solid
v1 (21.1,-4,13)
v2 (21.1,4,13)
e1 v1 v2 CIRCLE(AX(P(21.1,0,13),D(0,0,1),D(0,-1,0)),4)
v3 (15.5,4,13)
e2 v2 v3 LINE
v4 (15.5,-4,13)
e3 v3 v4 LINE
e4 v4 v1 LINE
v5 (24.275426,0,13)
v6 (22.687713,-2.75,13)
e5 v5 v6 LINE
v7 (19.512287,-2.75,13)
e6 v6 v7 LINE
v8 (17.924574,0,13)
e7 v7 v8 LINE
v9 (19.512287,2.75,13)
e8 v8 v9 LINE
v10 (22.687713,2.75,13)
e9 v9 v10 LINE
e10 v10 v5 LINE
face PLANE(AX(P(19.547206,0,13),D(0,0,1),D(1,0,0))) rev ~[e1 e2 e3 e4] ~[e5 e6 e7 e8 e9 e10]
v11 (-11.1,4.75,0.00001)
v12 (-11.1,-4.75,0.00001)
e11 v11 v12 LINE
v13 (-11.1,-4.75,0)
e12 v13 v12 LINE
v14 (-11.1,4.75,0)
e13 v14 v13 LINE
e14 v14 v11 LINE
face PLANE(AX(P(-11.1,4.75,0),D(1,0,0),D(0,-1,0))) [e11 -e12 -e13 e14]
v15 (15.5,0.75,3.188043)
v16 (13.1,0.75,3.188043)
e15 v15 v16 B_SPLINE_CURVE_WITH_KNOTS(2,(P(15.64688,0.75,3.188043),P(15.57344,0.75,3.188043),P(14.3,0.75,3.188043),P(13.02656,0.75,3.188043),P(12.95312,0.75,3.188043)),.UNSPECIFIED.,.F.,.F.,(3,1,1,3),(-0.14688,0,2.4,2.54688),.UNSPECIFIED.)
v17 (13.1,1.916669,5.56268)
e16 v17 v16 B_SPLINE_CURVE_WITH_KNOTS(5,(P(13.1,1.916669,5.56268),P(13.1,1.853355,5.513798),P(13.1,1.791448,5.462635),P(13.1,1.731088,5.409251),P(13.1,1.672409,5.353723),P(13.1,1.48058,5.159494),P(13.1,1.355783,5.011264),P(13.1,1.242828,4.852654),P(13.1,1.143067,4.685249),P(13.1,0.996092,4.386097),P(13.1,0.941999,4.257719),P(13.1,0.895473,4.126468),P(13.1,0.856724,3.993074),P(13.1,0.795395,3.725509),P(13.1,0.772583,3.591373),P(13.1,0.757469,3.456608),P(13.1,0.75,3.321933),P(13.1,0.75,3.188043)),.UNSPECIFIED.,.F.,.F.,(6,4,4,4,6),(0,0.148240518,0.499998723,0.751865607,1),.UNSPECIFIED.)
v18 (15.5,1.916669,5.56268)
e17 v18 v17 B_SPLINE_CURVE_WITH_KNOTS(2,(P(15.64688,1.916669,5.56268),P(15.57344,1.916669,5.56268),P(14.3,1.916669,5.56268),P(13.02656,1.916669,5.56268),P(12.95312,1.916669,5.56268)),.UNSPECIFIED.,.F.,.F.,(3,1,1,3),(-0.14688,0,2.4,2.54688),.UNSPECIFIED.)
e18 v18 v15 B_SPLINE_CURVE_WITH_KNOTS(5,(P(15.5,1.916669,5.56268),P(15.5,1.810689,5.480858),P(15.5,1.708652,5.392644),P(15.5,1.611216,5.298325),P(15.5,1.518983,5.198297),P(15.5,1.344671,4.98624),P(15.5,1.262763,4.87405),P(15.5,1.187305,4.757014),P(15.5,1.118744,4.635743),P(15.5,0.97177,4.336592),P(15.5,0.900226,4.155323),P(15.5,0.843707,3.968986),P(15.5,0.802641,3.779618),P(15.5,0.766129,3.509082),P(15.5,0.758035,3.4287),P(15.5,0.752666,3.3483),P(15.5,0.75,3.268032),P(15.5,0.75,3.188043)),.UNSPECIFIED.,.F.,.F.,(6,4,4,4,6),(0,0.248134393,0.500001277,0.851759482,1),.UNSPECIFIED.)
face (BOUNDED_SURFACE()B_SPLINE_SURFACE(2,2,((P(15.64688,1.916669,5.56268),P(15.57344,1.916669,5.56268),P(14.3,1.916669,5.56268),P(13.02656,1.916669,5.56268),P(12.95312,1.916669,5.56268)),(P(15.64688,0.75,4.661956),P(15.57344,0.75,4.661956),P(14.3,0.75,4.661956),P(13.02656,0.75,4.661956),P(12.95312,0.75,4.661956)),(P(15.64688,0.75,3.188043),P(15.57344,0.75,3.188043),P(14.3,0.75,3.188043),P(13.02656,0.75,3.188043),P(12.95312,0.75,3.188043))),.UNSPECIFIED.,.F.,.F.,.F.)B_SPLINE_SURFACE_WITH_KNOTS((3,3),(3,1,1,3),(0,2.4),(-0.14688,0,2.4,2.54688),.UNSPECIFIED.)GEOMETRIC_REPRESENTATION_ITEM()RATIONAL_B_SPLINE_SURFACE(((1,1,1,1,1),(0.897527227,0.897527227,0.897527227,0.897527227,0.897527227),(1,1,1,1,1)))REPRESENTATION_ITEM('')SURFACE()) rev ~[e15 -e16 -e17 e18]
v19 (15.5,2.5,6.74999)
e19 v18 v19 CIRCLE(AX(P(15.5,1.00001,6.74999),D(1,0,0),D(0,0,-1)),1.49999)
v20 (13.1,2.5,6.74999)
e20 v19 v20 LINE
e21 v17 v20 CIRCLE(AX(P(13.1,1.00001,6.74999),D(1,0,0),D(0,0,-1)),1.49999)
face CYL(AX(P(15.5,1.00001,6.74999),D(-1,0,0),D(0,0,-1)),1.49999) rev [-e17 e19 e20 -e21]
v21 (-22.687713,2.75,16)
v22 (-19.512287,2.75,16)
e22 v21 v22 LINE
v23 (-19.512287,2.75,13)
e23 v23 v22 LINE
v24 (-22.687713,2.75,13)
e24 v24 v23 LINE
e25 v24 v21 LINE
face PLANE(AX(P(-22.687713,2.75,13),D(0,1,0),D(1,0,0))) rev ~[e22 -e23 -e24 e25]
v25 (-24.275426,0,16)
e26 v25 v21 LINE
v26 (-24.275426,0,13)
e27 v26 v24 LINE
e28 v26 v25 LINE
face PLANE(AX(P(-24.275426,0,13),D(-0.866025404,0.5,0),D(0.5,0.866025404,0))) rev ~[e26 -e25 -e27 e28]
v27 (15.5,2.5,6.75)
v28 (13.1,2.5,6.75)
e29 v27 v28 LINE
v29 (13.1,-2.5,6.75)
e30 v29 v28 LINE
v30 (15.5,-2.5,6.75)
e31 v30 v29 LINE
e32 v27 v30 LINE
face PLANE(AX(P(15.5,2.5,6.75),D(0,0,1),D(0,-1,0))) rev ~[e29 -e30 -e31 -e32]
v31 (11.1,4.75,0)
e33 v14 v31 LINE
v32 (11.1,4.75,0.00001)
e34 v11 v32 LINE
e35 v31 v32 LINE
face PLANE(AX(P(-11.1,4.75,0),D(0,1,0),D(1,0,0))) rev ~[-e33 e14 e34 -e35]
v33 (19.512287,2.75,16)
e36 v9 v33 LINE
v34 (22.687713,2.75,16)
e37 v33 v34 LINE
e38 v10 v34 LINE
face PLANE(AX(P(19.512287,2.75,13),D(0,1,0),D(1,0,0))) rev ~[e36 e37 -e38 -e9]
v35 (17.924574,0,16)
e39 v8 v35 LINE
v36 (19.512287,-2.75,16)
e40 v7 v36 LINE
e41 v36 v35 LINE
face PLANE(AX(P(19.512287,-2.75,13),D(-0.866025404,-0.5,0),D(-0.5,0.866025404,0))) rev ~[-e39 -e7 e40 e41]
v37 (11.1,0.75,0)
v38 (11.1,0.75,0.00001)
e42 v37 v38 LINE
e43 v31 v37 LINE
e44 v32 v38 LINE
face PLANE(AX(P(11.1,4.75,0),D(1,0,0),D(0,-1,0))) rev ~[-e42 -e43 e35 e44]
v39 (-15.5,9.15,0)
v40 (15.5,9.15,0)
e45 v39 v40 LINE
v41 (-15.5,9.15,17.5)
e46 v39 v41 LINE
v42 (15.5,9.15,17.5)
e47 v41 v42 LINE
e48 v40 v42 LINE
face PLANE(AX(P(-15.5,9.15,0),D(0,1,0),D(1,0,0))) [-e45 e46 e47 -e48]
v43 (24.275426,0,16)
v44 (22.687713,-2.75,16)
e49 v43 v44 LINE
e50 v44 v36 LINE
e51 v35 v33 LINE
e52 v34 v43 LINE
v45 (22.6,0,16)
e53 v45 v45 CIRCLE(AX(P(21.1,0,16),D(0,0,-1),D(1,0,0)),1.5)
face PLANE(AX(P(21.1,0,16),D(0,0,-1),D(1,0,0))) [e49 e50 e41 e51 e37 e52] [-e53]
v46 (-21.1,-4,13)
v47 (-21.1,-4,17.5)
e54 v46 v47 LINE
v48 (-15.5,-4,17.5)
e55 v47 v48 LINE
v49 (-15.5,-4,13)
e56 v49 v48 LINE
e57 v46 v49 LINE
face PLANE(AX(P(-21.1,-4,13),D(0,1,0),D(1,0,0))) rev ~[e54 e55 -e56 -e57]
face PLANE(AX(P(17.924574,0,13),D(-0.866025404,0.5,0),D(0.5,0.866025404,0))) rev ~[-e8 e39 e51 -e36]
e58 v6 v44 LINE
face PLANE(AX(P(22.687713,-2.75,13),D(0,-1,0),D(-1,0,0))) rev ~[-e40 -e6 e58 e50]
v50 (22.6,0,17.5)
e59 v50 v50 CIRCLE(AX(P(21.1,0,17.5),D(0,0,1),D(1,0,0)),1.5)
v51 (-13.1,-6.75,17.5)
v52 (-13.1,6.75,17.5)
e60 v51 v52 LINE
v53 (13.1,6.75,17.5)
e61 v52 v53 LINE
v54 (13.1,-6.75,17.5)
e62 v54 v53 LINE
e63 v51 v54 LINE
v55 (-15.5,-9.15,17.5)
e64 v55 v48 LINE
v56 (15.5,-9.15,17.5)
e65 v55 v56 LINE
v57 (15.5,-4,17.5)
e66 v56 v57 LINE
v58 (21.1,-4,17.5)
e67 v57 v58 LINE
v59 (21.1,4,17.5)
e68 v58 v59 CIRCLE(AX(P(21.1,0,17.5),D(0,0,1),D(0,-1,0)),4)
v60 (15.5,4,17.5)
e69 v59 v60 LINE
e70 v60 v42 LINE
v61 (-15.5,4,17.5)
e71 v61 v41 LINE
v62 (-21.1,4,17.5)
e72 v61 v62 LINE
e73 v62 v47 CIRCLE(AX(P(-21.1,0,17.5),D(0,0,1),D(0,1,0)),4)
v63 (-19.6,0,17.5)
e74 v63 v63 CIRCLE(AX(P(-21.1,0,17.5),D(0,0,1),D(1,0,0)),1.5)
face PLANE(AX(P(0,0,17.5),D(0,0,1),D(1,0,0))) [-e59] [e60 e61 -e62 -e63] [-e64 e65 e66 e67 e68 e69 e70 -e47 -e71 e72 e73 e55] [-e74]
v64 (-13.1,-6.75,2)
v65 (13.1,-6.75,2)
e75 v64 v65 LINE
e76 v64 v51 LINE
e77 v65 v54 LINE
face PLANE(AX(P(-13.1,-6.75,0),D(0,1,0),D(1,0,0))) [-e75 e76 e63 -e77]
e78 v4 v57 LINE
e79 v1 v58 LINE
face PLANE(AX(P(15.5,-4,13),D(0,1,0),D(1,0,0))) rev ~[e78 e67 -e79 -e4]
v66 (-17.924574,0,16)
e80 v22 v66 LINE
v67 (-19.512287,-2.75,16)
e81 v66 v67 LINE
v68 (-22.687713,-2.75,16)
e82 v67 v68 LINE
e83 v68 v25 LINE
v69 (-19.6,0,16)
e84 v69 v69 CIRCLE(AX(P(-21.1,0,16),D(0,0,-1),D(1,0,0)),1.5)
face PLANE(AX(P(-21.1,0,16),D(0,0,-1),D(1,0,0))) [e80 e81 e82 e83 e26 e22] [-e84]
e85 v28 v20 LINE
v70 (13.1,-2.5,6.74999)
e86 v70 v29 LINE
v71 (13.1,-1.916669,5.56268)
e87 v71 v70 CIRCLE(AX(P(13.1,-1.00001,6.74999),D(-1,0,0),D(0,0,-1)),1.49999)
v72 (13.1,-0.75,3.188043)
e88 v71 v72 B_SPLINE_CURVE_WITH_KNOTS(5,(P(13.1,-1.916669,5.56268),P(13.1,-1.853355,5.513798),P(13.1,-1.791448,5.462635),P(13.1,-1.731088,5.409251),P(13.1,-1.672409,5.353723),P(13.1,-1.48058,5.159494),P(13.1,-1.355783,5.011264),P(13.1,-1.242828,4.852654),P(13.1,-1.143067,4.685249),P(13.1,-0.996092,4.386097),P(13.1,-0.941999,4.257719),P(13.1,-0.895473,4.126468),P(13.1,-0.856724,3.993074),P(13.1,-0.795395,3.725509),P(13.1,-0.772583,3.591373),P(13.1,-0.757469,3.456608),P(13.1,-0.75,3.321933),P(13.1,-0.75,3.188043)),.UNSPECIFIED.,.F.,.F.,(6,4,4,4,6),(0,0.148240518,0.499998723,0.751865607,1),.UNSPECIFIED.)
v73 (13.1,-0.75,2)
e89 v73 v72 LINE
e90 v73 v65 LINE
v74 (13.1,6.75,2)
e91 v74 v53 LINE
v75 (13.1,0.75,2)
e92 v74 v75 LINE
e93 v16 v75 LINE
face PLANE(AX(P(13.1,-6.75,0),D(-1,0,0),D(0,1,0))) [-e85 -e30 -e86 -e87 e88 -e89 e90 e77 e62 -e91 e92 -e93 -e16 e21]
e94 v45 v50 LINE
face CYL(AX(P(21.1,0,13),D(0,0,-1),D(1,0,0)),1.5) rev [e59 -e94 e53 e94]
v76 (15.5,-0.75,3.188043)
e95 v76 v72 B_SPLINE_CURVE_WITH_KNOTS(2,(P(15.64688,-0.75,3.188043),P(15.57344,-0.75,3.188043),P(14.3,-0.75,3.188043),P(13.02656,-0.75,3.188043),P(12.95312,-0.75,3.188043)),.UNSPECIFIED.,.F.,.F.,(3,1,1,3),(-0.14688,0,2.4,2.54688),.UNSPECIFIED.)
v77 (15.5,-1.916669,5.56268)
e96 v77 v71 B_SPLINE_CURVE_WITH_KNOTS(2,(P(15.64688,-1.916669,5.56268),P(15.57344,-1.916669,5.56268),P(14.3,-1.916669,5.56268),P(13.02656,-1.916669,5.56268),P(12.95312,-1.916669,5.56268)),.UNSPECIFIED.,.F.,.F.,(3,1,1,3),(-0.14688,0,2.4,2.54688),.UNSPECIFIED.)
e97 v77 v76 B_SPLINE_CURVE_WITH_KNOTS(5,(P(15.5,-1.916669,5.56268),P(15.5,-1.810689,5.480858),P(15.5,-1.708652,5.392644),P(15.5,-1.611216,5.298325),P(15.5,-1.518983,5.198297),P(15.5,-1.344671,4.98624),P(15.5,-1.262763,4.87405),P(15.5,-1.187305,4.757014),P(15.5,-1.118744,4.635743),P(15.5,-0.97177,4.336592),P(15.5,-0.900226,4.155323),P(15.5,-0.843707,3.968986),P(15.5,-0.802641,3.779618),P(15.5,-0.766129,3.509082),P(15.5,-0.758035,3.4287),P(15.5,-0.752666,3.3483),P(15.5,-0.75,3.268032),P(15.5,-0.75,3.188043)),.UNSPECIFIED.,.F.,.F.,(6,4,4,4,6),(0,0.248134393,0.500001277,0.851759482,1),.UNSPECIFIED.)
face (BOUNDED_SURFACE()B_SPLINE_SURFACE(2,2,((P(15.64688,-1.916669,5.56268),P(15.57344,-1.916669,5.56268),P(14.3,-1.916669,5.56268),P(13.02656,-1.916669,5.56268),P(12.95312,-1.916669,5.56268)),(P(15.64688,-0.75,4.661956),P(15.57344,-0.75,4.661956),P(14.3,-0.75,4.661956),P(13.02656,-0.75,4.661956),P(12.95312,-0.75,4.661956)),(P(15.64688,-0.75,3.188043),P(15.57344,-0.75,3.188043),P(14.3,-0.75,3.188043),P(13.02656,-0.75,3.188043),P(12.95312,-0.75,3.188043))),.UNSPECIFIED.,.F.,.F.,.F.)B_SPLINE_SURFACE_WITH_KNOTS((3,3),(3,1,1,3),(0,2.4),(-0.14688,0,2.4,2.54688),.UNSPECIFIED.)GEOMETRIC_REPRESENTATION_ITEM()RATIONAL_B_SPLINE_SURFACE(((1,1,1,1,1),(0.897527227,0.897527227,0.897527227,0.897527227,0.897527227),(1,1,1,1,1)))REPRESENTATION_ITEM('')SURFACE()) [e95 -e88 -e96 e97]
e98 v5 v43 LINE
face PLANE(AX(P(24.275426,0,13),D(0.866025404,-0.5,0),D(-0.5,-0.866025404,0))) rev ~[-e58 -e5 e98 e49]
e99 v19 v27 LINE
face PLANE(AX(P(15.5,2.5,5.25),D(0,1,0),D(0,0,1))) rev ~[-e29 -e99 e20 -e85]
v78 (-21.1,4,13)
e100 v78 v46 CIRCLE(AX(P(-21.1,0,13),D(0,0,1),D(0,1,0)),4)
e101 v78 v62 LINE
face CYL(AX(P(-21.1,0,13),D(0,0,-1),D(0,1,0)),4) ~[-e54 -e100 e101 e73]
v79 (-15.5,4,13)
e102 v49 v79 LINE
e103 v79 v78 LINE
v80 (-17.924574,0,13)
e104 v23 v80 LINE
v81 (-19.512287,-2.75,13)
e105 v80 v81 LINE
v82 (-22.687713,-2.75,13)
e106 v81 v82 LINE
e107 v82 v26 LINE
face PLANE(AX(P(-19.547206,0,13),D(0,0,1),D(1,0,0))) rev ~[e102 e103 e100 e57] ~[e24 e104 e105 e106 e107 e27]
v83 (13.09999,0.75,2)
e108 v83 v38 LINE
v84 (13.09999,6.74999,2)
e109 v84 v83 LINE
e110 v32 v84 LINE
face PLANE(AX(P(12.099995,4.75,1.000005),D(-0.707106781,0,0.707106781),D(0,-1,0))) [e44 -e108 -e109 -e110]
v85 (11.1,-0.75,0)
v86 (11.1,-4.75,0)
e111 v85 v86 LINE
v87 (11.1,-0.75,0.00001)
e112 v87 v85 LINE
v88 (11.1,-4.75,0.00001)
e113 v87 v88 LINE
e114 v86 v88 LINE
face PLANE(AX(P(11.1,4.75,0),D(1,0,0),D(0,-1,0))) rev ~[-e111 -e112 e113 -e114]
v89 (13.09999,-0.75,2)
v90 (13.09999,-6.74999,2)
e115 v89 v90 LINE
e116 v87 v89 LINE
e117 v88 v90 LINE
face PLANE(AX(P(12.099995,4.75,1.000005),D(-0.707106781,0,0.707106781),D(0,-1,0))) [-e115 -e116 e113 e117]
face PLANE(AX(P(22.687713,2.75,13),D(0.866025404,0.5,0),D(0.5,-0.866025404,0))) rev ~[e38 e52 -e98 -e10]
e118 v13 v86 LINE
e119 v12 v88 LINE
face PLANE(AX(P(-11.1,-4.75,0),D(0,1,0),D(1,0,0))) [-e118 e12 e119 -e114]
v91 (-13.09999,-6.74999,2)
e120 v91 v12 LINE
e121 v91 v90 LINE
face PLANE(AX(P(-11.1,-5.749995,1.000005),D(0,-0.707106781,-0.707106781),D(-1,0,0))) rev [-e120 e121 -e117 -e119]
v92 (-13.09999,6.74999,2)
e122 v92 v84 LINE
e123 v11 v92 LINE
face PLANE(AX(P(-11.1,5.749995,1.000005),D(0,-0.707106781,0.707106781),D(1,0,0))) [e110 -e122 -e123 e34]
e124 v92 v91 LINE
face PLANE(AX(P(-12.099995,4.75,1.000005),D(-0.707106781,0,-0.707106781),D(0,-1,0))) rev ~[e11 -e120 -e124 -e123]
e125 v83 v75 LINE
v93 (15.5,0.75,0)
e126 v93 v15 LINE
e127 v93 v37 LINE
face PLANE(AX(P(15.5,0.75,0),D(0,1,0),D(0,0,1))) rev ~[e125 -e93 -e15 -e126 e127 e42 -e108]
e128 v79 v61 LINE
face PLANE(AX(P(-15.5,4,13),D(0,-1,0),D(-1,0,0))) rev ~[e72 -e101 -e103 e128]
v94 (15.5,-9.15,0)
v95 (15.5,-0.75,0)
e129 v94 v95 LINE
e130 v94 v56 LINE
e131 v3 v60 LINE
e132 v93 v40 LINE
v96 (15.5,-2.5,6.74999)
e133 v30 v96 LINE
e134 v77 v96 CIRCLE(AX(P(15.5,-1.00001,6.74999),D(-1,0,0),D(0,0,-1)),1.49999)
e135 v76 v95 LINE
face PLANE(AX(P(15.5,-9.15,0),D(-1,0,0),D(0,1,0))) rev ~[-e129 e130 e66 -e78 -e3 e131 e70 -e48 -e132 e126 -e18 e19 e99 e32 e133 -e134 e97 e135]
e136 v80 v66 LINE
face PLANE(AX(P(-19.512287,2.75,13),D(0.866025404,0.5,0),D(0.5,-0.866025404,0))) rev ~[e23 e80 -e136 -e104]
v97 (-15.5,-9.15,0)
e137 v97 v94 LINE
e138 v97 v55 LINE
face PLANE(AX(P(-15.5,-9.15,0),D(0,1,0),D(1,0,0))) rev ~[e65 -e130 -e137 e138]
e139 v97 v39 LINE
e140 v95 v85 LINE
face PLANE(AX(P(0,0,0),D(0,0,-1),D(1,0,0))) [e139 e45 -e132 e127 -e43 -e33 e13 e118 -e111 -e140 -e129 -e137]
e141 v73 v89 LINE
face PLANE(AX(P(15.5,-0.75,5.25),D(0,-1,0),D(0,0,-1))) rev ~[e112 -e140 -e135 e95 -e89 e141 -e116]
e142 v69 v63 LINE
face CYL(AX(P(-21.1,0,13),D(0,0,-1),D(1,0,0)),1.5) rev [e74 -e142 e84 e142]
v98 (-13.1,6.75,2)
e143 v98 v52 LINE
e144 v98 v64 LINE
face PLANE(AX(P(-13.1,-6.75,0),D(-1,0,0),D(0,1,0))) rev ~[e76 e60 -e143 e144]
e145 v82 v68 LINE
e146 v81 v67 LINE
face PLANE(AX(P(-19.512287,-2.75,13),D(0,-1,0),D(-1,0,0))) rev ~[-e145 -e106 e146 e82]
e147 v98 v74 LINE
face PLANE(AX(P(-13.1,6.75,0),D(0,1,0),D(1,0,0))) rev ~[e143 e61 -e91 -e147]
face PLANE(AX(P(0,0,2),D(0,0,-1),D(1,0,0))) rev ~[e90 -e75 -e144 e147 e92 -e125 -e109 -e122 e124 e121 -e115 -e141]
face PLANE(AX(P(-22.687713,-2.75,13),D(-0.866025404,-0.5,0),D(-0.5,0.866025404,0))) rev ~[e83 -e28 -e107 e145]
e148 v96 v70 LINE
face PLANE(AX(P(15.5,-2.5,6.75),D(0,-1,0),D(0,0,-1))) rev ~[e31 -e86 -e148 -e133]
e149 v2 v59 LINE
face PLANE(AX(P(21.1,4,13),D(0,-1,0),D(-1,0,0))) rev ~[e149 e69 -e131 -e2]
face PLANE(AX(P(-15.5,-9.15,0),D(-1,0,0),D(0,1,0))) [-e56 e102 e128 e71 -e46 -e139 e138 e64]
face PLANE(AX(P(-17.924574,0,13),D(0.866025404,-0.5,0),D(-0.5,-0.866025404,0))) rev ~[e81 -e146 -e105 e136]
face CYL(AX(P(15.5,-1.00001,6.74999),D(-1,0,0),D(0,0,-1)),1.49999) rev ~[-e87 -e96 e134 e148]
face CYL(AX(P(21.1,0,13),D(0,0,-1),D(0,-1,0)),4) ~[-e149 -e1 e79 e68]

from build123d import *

# Parameters (mm, degrees)
F0_W      = 31
F0_H      = 18.3
F0_W_2    = 26.2
F0_H_2    = 13.5
F1_DEPTH  = 17.5
F2_W      = 26.2
F2_H      = 13.5
F2_W_2    = 22.2
F2_H_2    = 9.5
F3_DEPTH  = 2
F4_SIZE   = 1.99999
F6_START  = 13
F5_R      = 1.5
F6_DEPTH  = 4.5
F8_DEPTH  = 3
F10_DEPTH = 5
F11_R     = 1.49999
F12_R     = 3


# Not quite as in the source:
# - a fillet or chamfer is up to 0.001 mm smaller than in the source, because OpenCascade refuses the exact size


with BuildPart() as f1:
    # F0 (on Top) → F1 (new body)
    with BuildSketch(Plane.XY):
        Rectangle(F0_W, F0_H)
        Rectangle(F0_W_2, F0_H_2, mode=Mode.SUBTRACT)
    extrude(amount=F1_DEPTH)

    # F2 (on face) → F3 (join)
    with BuildSketch(Plane(origin=(0, 0, 0), x_dir=(1, 0, 0), z_dir=(0, 0, -1))):
        Rectangle(F2_W, F2_H)
        Rectangle(F2_W_2, F2_H_2, mode=Mode.SUBTRACT)
    extrude(amount=-F3_DEPTH)

    # F4 (size 2 in the source; OpenCascade refuses exactly that, so slightly less here)
    f4_edges = [f1.edges().sort_by_distance(p)[0] for p in [
        (0, 4.75, 2),
        (11.1, 0, 2),
        (0, -4.75, 2),
        (-11.1, 0, 2),
    ]]
    chamfer(f4_edges, length=F4_SIZE)

    # F5 (on Top) → F6 (join)
    with BuildSketch(Plane.XY.offset(F6_START)):
        with BuildLine():
            Line((17.1, -4), (21.1, -4))
            ThreePointArc((21.1, -4), (25.1, 0), (21.1, 4))
            Line((21.1, 4), (17.1, 4))
            Line((17.1, 4), (15.5, 4))
            Line((15.5, 4), (15.5, -4))
            Line((15.5, -4), (17.1, -4))
        make_face()
        with Locations((21.1, 0)):
            Circle(F5_R, mode=Mode.SUBTRACT)
        with BuildLine():
            ThreePointArc((-21.1, 4), (-25.1, 0), (-21.1, -4))
            Line((-21.1, -4), (-17.1, -4))
            Line((-17.1, -4), (-15.5, -4))
            Line((-15.5, -4), (-15.5, 4))
            Line((-15.5, 4), (-17.1, 4))
            Line((-17.1, 4), (-21.1, 4))
        make_face()
        with Locations((-21.1, 0)):
            Circle(F5_R, mode=Mode.SUBTRACT)
    extrude(amount=F6_DEPTH)

    # F7 (on face) → F8 (cut)
    with BuildSketch(Plane(origin=(0, 0, 13), x_dir=(1, 0, 0), z_dir=(0, 0, -1))):
        Polygon((22.6877132403, 2.75), (19.5122867597, 2.75), (17.9245735195, 0), (19.5122867597, -2.75), (22.6877132403, -2.75), (24.2754264805, 0), align=None)
        Polygon((-19.5122867597, 2.75), (-22.6877132403, 2.75), (-24.2754264805, 0), (-22.6877132403, -2.75), (-19.5122867597, -2.75), (-17.9245735195, 0), align=None)
    extrude(amount=-F8_DEPTH, mode=Mode.SUBTRACT)

    # F9 (on face) → F10 (cut)
    with BuildSketch(Plane.YZ.offset(15.5)):
        Polygon((0.75, 5.25), (2.5, 5.25), (2.5, 6.75), (-2.5, 6.75), (-2.5, 5.25), (-0.75, 5.25), (-0.75, 0), (0.75, 0), align=None)
    extrude(amount=-F10_DEPTH, mode=Mode.SUBTRACT)

    # F11 (radius 1.5 in the source; OpenCascade refuses exactly that, so slightly less here)
    f11_edges = [f1.edges().sort_by_distance(p)[0] for p in [
        (14.3, -2.5, 5.25),
        (14.3, 2.5, 5.25),
    ]]
    fillet(f11_edges, radius=F11_R)

    # F12
    f12_edges = [f1.edges().sort_by_distance(p)[0] for p in [
        (14.3, -0.75, 5.25),
        (14.3, 0.75, 5.25),
    ]]
    fillet(f12_edges, radius=F12_R)


solid = f1.part
